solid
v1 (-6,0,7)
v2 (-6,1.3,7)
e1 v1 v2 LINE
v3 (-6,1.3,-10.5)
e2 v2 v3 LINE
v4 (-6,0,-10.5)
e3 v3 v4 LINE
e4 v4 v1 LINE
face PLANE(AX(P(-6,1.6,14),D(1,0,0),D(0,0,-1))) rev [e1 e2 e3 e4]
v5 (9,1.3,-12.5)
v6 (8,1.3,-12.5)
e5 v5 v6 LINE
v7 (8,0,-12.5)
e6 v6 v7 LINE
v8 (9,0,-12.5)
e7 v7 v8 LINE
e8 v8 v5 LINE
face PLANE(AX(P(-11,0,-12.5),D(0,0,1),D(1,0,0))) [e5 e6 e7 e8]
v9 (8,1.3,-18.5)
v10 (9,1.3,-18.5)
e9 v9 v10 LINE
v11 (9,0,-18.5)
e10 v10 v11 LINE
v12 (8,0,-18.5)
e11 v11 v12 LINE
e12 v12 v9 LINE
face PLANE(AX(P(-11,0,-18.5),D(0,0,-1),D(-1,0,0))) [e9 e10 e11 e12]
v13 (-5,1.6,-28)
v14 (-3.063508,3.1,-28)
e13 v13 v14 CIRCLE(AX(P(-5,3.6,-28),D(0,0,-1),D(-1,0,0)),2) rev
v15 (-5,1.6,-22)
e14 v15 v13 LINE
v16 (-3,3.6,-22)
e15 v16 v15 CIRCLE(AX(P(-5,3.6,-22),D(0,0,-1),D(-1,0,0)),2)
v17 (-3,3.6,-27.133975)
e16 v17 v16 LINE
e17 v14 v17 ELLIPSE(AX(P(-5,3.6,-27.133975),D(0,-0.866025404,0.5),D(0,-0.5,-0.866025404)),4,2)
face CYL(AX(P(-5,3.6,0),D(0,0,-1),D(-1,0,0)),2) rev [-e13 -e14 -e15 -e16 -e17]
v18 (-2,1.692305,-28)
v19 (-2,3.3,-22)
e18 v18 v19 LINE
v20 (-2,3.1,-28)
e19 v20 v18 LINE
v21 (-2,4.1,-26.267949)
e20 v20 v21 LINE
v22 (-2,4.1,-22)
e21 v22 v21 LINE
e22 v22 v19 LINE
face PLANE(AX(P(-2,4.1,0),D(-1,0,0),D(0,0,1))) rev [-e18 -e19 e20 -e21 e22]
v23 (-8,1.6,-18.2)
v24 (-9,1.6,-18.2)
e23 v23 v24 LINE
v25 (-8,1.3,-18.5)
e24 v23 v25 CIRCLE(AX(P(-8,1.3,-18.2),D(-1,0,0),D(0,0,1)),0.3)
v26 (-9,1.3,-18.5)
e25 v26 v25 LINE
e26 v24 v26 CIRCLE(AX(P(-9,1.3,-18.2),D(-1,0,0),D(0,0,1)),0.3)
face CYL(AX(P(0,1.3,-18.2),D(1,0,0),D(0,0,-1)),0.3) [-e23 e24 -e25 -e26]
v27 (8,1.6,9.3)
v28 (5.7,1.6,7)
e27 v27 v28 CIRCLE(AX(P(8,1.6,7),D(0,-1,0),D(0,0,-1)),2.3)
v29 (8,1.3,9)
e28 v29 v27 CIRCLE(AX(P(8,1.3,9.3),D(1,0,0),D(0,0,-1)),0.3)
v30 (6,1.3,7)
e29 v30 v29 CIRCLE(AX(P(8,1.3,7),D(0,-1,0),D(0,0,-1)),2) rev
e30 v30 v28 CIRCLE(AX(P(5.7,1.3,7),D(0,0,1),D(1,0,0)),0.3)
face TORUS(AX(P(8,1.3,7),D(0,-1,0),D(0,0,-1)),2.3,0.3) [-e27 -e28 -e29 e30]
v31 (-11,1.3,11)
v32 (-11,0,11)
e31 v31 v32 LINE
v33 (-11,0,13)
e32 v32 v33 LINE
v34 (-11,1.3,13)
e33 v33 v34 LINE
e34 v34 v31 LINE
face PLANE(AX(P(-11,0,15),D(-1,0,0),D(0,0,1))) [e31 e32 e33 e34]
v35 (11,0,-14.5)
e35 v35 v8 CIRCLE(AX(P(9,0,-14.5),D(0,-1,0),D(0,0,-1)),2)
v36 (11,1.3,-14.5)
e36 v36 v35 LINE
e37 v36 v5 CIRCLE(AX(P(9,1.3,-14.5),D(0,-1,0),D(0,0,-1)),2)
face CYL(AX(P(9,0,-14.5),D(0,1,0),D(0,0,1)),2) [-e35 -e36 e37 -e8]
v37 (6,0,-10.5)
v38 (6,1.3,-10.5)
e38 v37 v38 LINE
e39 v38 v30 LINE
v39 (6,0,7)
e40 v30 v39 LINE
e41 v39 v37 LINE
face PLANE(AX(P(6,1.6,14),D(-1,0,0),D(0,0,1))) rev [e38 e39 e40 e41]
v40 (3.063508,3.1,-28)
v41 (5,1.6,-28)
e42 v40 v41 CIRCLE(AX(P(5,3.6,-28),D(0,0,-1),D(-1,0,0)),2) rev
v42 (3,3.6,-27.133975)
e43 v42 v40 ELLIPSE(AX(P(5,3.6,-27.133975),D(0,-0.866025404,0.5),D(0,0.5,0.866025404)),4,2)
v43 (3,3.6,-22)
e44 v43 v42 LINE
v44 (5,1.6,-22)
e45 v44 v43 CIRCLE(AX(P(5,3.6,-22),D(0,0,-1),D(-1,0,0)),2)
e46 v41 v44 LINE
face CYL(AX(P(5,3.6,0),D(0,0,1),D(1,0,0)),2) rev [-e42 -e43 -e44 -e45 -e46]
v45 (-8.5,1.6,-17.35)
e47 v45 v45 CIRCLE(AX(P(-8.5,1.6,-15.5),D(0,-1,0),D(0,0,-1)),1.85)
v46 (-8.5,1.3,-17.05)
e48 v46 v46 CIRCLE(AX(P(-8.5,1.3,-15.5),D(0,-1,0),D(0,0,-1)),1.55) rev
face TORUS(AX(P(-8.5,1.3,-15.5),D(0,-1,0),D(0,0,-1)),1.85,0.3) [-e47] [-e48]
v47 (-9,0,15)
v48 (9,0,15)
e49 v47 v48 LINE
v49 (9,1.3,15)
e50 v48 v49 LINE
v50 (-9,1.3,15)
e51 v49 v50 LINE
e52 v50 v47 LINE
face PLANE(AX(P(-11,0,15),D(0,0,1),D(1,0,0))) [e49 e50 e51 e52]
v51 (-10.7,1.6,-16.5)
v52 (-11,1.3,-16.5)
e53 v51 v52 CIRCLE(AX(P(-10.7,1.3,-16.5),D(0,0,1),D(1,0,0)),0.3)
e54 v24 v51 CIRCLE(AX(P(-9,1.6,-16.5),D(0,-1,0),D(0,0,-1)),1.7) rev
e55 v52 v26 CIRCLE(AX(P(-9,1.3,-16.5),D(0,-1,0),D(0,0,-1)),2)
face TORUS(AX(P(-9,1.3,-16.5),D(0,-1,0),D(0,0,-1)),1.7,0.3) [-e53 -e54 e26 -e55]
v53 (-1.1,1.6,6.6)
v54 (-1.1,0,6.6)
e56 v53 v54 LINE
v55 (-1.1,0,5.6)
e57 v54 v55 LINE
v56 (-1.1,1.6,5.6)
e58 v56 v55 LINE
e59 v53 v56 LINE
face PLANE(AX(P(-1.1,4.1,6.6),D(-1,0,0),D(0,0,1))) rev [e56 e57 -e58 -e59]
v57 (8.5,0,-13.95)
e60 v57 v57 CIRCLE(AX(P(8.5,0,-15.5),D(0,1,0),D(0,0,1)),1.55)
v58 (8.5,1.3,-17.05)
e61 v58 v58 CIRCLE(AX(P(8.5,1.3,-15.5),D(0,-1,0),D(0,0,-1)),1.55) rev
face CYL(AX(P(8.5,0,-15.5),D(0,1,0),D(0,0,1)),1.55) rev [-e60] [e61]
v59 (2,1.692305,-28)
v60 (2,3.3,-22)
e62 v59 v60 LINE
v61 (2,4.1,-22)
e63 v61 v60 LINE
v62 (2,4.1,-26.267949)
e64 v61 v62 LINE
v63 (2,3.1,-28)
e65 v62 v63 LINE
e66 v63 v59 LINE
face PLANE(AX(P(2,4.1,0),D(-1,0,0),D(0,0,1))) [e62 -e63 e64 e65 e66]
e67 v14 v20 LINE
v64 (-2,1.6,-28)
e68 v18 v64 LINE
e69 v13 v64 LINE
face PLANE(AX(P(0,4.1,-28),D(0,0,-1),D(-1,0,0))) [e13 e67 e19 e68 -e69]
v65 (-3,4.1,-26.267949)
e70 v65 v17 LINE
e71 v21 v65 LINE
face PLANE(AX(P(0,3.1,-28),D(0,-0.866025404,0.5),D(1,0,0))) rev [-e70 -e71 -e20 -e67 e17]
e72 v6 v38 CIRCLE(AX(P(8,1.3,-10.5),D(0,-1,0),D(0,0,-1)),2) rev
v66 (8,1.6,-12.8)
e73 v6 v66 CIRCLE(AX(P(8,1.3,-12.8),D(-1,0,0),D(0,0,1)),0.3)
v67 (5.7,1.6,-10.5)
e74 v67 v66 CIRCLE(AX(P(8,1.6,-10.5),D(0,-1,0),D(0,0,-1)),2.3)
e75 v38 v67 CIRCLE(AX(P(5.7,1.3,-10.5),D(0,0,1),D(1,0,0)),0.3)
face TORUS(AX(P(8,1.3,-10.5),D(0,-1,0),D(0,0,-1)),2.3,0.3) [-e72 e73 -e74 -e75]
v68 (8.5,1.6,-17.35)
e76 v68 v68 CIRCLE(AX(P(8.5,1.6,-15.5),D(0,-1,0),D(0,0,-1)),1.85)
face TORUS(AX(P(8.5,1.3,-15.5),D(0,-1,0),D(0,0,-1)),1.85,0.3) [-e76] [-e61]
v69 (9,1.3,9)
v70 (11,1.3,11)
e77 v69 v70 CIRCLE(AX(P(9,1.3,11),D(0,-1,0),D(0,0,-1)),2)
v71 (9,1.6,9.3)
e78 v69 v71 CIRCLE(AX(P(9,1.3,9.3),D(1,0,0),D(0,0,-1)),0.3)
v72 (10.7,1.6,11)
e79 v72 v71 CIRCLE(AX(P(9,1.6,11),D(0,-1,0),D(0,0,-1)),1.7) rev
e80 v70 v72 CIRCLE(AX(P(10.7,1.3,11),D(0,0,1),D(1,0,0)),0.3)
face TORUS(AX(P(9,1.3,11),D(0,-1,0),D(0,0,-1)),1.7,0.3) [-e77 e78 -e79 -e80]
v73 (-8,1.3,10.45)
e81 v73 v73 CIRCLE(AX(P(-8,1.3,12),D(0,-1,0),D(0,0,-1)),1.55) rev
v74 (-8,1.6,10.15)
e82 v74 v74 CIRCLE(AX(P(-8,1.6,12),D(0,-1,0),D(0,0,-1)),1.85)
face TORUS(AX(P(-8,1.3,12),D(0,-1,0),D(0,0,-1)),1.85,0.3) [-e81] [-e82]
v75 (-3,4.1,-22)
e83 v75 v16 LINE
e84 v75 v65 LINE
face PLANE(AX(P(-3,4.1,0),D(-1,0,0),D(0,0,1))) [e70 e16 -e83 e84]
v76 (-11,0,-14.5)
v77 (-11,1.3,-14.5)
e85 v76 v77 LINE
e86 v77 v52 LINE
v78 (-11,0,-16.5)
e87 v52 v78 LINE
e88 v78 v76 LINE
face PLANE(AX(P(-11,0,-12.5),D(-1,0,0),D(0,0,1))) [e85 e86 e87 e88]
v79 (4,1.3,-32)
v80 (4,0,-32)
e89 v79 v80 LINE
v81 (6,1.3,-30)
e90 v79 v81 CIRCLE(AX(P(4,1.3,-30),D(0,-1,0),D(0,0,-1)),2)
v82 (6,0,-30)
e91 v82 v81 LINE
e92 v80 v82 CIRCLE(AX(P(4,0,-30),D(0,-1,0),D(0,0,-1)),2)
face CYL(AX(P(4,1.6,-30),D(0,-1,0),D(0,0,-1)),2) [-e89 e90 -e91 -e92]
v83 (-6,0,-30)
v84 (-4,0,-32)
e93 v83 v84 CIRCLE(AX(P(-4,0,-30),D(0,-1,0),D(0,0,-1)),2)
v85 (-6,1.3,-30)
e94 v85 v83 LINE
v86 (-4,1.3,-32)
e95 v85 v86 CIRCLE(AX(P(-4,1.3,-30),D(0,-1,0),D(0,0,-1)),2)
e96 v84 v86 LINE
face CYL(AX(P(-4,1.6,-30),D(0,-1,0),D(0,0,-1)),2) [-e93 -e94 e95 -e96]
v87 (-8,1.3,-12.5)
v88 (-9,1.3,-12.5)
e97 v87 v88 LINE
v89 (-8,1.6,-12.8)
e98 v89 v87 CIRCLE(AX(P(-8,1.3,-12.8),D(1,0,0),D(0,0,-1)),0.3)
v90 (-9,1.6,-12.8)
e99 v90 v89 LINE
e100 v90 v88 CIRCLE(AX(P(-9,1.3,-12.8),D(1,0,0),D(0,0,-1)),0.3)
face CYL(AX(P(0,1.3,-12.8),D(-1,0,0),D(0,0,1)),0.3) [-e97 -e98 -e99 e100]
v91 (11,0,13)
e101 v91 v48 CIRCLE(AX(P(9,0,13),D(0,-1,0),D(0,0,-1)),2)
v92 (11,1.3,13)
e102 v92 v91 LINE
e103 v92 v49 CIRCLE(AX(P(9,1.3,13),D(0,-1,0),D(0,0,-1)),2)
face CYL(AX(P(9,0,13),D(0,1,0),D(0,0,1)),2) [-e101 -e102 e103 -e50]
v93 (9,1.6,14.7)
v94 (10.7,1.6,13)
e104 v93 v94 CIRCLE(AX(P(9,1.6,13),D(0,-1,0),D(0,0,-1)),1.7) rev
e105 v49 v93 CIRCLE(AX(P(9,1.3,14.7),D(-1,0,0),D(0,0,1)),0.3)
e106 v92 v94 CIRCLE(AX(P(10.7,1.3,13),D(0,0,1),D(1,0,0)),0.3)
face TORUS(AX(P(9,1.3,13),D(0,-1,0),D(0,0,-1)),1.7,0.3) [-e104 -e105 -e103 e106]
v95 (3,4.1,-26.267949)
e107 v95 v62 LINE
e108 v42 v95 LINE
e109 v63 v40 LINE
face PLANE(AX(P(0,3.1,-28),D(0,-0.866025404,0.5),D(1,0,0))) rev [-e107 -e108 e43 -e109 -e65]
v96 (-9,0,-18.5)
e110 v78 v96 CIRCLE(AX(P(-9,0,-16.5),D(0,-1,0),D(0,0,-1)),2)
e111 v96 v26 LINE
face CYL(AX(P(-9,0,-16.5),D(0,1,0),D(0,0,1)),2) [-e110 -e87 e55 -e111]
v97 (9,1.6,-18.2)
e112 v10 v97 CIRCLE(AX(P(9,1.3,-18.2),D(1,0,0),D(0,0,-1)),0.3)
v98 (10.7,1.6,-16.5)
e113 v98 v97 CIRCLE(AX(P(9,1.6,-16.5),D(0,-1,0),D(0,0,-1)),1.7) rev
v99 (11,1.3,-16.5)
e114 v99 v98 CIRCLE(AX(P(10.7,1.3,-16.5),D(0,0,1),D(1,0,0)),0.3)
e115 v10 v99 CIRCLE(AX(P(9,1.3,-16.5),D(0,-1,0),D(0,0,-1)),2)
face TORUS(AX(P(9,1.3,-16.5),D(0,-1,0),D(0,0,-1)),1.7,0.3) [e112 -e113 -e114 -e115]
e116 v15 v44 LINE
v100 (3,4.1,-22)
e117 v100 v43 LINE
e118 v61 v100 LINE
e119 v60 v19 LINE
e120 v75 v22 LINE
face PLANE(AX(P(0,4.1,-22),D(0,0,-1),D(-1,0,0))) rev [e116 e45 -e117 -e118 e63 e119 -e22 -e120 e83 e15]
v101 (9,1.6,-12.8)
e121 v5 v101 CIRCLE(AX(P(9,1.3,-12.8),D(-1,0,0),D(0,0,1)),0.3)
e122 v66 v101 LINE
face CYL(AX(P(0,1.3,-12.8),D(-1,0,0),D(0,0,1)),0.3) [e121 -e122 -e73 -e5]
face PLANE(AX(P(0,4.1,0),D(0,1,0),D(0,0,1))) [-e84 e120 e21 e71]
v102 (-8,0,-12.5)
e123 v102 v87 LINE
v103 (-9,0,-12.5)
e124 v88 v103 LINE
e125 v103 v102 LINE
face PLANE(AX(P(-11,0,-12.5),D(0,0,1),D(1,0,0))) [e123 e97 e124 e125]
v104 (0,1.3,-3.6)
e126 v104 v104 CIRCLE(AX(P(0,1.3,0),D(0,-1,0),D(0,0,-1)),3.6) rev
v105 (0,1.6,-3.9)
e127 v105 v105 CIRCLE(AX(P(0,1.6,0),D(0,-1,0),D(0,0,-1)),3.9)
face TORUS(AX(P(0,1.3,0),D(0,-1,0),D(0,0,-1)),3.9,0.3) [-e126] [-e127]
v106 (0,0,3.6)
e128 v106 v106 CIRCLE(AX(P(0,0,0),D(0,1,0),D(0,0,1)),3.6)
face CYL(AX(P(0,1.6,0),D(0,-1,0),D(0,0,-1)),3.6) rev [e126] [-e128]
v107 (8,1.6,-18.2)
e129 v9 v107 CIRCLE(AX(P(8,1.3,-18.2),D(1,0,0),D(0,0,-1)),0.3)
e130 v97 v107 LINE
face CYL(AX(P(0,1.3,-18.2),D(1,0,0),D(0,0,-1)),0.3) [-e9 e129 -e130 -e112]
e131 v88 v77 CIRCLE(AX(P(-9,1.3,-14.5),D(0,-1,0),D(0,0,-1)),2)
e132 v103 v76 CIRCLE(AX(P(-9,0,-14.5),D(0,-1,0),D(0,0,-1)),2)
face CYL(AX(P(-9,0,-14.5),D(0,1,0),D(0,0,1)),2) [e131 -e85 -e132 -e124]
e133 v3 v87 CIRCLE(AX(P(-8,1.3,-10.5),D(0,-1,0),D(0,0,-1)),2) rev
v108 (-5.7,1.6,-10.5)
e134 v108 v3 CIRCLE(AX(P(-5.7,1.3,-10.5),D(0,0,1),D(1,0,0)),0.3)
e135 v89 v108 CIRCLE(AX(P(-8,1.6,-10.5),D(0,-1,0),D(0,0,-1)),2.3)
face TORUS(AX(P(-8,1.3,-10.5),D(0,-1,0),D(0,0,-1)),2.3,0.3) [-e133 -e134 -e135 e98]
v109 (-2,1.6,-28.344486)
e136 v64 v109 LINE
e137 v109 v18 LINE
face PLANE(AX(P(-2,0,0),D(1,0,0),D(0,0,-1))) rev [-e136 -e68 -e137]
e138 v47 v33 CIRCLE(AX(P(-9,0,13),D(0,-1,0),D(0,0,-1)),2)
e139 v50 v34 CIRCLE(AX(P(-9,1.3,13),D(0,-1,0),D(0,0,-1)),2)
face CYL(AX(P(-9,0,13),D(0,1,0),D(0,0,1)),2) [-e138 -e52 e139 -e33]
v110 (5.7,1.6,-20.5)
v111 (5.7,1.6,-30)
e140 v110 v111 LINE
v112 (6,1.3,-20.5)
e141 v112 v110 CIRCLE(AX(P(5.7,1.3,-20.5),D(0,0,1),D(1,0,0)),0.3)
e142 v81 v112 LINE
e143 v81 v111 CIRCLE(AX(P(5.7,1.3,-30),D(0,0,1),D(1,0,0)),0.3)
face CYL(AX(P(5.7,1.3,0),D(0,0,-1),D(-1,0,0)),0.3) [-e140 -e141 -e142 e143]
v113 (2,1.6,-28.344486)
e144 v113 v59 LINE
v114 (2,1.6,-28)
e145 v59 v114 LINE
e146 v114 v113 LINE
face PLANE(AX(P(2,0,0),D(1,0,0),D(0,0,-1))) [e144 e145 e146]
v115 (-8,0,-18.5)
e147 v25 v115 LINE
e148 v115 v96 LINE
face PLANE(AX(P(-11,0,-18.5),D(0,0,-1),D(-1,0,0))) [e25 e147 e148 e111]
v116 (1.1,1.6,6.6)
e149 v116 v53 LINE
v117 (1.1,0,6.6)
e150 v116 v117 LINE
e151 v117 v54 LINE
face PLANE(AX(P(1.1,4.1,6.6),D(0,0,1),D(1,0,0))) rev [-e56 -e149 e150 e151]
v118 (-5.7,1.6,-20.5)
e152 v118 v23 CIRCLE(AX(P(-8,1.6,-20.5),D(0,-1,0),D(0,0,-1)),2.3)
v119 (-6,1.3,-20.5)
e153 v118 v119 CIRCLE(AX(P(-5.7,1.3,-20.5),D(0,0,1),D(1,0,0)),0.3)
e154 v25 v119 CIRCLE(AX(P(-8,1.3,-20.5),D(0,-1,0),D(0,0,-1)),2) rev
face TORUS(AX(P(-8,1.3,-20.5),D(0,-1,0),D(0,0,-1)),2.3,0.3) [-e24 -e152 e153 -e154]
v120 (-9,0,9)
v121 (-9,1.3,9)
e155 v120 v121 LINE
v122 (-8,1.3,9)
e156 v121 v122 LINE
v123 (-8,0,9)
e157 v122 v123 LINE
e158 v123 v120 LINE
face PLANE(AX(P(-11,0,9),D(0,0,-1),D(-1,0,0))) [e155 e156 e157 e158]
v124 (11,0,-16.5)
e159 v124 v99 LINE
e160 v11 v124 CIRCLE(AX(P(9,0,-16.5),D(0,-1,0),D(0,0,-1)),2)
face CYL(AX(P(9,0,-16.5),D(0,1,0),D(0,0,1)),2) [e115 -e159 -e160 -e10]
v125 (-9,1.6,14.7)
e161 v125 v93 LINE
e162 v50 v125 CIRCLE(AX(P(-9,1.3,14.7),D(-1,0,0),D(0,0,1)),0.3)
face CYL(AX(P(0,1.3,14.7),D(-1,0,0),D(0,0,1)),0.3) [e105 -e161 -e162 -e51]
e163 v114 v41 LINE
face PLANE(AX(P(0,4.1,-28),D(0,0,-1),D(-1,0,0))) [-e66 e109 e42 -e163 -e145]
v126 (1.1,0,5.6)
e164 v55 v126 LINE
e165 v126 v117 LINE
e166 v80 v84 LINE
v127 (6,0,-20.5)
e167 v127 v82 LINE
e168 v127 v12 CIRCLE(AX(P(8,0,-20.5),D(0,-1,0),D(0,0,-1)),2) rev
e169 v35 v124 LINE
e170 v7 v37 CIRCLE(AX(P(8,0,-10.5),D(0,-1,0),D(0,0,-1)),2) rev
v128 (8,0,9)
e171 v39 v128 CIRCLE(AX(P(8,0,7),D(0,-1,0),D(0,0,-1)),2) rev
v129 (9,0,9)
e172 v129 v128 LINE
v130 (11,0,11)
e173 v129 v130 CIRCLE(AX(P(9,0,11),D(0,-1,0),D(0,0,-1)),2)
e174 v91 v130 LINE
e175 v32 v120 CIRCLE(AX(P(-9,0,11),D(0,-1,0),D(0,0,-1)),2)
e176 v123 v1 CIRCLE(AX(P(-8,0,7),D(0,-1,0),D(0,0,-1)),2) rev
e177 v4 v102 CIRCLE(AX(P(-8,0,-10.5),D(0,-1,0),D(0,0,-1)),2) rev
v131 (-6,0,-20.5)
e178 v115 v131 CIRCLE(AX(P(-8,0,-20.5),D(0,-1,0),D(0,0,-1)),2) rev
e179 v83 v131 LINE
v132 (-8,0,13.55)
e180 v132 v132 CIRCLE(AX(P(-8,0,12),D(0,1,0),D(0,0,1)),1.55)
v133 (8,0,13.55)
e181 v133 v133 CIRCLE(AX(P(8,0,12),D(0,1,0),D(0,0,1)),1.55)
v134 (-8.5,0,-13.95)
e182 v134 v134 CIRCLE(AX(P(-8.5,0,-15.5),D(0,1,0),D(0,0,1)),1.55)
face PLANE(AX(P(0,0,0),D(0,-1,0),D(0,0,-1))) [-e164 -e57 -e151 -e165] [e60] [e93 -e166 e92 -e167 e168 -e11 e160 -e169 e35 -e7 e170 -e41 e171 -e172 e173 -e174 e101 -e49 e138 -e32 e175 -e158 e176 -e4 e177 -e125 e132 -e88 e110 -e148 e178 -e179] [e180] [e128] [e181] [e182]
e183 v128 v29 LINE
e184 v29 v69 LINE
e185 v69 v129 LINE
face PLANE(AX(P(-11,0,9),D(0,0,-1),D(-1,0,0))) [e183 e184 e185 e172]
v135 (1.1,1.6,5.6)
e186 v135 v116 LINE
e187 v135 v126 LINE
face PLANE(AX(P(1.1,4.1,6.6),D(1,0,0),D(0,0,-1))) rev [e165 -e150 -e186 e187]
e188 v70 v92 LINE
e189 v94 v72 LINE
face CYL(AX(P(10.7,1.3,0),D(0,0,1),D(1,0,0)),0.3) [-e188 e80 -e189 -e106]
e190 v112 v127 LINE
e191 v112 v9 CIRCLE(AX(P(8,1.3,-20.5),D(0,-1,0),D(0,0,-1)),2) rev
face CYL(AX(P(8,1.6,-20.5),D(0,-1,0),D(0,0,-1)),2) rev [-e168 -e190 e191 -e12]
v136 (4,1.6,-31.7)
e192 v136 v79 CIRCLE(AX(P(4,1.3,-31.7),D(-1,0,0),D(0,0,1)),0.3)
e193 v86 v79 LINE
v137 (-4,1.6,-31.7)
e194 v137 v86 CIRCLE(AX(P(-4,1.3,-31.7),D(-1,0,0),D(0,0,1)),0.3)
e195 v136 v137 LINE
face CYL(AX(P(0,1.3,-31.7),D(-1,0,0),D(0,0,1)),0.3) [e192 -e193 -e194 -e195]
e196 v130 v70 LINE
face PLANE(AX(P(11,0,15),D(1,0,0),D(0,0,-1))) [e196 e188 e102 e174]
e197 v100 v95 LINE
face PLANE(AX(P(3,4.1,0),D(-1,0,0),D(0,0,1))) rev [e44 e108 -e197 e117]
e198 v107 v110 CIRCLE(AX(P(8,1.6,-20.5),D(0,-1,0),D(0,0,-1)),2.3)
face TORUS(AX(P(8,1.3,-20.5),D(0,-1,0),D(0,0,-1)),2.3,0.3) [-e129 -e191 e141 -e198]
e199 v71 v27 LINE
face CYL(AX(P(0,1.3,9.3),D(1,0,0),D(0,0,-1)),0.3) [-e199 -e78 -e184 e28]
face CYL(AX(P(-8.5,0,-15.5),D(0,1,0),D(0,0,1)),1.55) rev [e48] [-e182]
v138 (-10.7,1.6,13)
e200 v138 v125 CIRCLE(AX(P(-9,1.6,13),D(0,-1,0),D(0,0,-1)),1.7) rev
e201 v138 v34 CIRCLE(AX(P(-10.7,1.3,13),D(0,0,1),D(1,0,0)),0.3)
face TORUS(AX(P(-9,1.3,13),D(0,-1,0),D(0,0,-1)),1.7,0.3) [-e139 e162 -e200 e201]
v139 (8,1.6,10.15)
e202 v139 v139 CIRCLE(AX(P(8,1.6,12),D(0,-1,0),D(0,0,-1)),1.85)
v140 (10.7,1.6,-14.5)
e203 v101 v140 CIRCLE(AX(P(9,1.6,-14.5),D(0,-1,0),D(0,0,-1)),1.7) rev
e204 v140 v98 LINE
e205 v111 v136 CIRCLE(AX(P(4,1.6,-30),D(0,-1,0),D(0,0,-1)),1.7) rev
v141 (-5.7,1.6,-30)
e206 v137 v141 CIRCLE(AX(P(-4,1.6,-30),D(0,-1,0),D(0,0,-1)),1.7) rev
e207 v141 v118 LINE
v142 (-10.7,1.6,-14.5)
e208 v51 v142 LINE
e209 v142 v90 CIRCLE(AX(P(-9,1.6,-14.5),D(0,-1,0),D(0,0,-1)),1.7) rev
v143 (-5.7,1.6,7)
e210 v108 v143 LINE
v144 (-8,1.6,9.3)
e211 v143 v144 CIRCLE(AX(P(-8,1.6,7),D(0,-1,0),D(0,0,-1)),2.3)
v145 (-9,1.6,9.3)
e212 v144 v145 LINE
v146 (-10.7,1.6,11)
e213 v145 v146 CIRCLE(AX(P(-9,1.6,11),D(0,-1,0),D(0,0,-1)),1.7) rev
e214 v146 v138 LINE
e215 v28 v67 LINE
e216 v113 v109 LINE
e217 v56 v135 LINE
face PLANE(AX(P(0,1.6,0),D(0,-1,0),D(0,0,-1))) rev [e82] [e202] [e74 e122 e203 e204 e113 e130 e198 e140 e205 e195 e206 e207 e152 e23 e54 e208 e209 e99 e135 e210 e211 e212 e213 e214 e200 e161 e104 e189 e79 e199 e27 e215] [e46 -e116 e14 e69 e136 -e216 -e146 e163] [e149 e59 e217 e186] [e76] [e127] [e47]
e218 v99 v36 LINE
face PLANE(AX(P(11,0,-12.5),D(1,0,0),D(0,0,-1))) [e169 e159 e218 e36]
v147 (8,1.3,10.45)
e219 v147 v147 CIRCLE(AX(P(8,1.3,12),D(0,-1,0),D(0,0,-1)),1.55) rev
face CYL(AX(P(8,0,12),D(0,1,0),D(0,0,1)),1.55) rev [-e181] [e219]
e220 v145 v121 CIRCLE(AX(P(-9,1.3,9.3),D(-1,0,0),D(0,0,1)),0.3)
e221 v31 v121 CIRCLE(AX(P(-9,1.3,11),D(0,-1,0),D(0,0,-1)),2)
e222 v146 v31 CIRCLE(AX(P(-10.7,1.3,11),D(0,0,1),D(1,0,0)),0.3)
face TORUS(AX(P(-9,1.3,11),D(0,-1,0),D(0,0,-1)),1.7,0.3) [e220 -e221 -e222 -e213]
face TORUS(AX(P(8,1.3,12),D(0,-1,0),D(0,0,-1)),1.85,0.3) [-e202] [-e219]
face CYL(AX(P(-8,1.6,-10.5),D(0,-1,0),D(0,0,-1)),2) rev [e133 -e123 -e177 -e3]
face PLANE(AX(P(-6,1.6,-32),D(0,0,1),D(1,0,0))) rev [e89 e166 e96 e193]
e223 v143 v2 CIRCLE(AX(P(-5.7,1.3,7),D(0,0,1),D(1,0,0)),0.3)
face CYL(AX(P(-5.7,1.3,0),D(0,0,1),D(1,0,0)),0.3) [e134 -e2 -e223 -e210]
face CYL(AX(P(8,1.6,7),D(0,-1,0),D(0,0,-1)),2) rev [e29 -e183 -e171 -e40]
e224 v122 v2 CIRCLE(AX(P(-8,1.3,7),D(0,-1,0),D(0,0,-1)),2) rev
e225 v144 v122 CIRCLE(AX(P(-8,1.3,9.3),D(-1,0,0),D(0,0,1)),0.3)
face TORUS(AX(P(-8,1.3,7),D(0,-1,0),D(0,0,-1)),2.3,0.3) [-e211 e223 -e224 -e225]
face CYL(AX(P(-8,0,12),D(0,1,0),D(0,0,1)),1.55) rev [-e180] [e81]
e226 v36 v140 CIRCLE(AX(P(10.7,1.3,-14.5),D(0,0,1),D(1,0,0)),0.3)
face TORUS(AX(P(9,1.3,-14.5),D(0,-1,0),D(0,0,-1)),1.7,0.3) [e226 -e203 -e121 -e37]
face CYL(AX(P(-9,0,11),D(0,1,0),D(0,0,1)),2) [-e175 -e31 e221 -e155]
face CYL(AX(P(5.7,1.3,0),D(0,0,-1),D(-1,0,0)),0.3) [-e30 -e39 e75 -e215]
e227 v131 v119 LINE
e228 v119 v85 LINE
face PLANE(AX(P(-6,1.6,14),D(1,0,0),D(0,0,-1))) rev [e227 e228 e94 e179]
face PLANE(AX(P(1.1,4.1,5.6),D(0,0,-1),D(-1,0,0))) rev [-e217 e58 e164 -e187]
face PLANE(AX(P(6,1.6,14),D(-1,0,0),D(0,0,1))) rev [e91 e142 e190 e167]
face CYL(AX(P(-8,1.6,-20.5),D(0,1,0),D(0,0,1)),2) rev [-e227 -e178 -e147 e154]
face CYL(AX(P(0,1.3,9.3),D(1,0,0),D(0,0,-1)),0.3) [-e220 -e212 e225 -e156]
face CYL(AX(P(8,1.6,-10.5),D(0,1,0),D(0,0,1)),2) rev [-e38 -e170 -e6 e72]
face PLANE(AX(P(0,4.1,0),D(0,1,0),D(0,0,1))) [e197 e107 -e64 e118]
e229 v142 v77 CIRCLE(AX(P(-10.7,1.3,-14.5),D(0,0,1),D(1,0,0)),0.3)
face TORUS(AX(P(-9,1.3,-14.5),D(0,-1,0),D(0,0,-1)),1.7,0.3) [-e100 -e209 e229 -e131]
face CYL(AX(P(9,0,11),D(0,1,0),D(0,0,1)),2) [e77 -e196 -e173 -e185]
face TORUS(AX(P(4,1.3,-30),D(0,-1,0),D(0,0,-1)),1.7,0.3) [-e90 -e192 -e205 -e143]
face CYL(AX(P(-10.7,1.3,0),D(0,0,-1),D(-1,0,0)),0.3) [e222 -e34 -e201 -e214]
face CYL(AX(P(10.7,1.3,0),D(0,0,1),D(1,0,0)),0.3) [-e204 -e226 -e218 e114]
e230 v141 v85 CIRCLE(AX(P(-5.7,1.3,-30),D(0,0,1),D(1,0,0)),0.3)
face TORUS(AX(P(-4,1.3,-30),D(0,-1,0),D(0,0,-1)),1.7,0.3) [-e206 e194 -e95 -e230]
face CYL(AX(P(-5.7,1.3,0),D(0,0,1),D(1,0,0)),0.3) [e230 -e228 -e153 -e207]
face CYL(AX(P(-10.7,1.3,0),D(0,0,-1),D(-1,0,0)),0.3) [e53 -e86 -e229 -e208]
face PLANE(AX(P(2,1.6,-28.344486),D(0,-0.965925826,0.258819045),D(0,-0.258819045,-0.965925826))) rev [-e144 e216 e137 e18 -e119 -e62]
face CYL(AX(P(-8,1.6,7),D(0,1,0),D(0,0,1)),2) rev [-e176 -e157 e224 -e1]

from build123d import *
from OCP.BRepFilletAPI import BRepFilletAPI_MakeChamfer

# Parameters (mm, degrees)
SKETCH1_W           = 12
SKETCH1_H           = 46
BOSS_EXTRUDE1_DEPTH = 1.6
SKETCH2_R           = 3.6
CUT_EXTRUDE1_DEPTH  = 33.596932371
SKETCH5_W           = 22
SKETCH5_H           = 6
BOSS_EXTRUDE4_DEPTH = 1.6
SKETCH6_R           = 1.55
CUT_EXTRUDE2_DEPTH  = 34.875654975
FILLET1_R           = 2
FILLET2_R           = 0.3
SKETCH8_W           = 1
SKETCH8_H           = 6
BOSS_EXTRUDE6_DEPTH = 2.5
BOSS_EXTRUDE7_DEPTH = 4
SKETCH10_W          = 2.2
SKETCH10_H          = 1
CUT_EXTRUDE3_DEPTH  = 35.085334122
CHAMFER1_SIZE       = 1
CHAMFER1_SIZE2      = 1.732050808
FILLET5_R           = 2


with BuildPart() as part:
    # Sketch1 → Boss-Extrude1 (new body)
    with BuildSketch(Plane(origin=(0, 0, 0), x_dir=(1, 0, 0), z_dir=(0, 1, 0))):
        with Locations((0, 9)):
            Rectangle(SKETCH1_W, SKETCH1_H)
    extrude(amount=BOSS_EXTRUDE1_DEPTH)

    # Sketch2 → Cut-Extrude1 (cut, through all)
    with BuildSketch(Plane(origin=(0, 0, 0), x_dir=(1, 0, 0), z_dir=(0, 1, 0))):
        with Locations(Location((0, 0, 0), (0, 0, 270))):
            Circle(SKETCH2_R)
    extrude(amount=CUT_EXTRUDE1_DEPTH, mode=Mode.SUBTRACT)

    # Sketch5 → Boss-Extrude4 (add)
    with BuildSketch(Plane(origin=(0, 1.6, 0), x_dir=(1, 0, 0), z_dir=(0, 1, 0))):
        with Locations((0, 15.5)):
            Rectangle(SKETCH5_W, SKETCH5_H)
        with Locations((0, -12)):
            Rectangle(SKETCH5_W, SKETCH5_H)
    extrude(amount=-BOSS_EXTRUDE4_DEPTH)

    # Sketch6 → Cut-Extrude2 (cut, through all)
    with BuildSketch(Plane(origin=(0, 1.6, 0), x_dir=(1, 0, 0), z_dir=(0, 1, 0))):
        with Locations(Location((-8.5, 15.5, 0), (0, 0, 270))):
            Circle(SKETCH6_R)
        with Locations(Location((8.5, 15.5, 0), (0, 0, 270))):
            Circle(SKETCH6_R)
        with Locations(Location((8, -12, 0), (0, 0, 270))):
            Circle(SKETCH6_R)
        with Locations(Location((-8, -12, 0), (0, 0, 270))):
            Circle(SKETCH6_R)
    extrude(amount=-CUT_EXTRUDE2_DEPTH, mode=Mode.SUBTRACT)

    # Fillet1
    fillet1_edges = [part.edges().sort_by_distance(p)[0] for p in [
        (11, 0.8, -12.5),
        (-11, 0.8, -18.5),
        (11, 0.8, -18.5),
        (6, 0.8, -12.5),
        (-6, 0.8, -12.5),
        (-11, 0.8, -12.5),
        (6, 0.8, -18.5),
        (-6, 0.8, -18.5),
        (-11, 0.8, 9),
        (11, 0.8, 9),
        (11, 0.8, 15),
        (-11, 0.8, 15),
        (6, 0.8, 9),
        (-6, 0.8, 9),
        (-6, 0.8, -32),
        (6, 0.8, -32),
    ]]
    fillet(fillet1_edges, radius=FILLET1_R)

    # Fillet2
    fillet2_edges = [part.edges().sort_by_distance(p)[0] for p in [
        (-10.414213562, 1.6, -17.914213562),
        (10.414213562, 1.6, -17.914213562),
        (10.414213562, 1.6, -13.085786438),
        (-5.414213562, 1.6, -31.414213562),
        (5.414213562, 1.6, -31.414213562),
        (-10.414213562, 1.6, 9.585786438),
        (-10.414213562, 1.6, 14.414213562),
        (10.414213562, 1.6, 9.585786438),
        (10.414213562, 1.6, 14.414213562),
        (6.585786438, 1.6, 8.414213562),
        (-6.585786438, 1.6, 8.414213562),
        (6.585786438, 1.6, -11.914213562),
        (6.585786438, 1.6, -19.085786438),
        (-6.585786438, 1.6, -19.085786438),
        (-6.585786438, 1.6, -11.914213562),
        (0, 1.6, -3.6),
        (-8, 1.6, 10.45),
        (8, 1.6, 10.45),
        (8.5, 1.6, -17.05),
        (-8.5, 1.6, -17.05),
        (0, 1.6, 15),
        (8.5, 1.6, 9),
        (6, 1.6, -1.75),
        (8.5, 1.6, -12.5),
        (11, 1.6, -15.5),
        (8.5, 1.6, -18.5),
        (6, 1.6, -25.25),
        (0, 1.6, -32),
        (-6, 1.6, -25.25),
        (-8.5, 1.6, -18.5),
        (-11, 1.6, -15.5),
        (-8.5, 1.6, -12.5),
        (-6, 1.6, -1.75),
        (-8.5, 1.6, 9),
        (-11, 1.6, 12),
        (11, 1.6, 12),
        (-10.414213562, 1.6, -13.085786438),
    ]]
    fillet(fillet2_edges, radius=FILLET2_R)

    # Sketch8 → Boss-Extrude6 (add)
    with BuildSketch(Plane(origin=(0, 1.6, 0), x_dir=(1, 0, 0), z_dir=(0, 1, 0))):
        with Locations((-2.5, 25)):
            Rectangle(SKETCH8_W, SKETCH8_H)
        with Locations((2.5, 25)):
            Rectangle(SKETCH8_W, SKETCH8_H)
    extrude(amount=BOSS_EXTRUDE6_DEPTH)

    # Sketch9 → Boss-Extrude7 (add)
    with BuildSketch(Plane(origin=(-2, 0, 0), x_dir=(0, 0, -1), z_dir=(1, 0, 0))):
        Polygon((22, 1.6), (28.344486373, 1.6), (22, 3.3), align=None)
    extrude(amount=BOSS_EXTRUDE7_DEPTH)

    # Sketch10 → Cut-Extrude3 (cut, through all)
    with BuildSketch(Plane.XZ):
        with Locations((0, 6.1)):
            Rectangle(SKETCH10_W, SKETCH10_H)
    extrude(amount=-CUT_EXTRUDE3_DEPTH, mode=Mode.SUBTRACT)

    # Chamfer1: one chamfer whose edges measure the first distance from different faces: ONE call of the kernel's chamfer builder (chamfer() names one face for all edges)
    chamfer1_edges_1 = [part.edges().sort_by_distance(p)[0] for p in [
        (-2.5, 4.1, -28),
    ]]
    chamfer1_side_1 = [part.faces().sort_by_distance(p)[0] for p in [
        (-2.5, 2.85, -28),
    ]]
    chamfer1_edges_2 = [part.edges().sort_by_distance(p)[0] for p in [
        (2.5, 4.1, -28),
    ]]
    chamfer1_side_2 = [part.faces().sort_by_distance(p)[0] for p in [
        (2.5, 2.85, -28),
    ]]
    chamfer1 = BRepFilletAPI_MakeChamfer(part.part.solid().wrapped)
    for e in chamfer1_edges_1:
        chamfer1.Add(CHAMFER1_SIZE, CHAMFER1_SIZE2, e.wrapped, chamfer1_side_1[0].wrapped)  # the first distance lies on this face
    for e in chamfer1_edges_2:
        chamfer1.Add(CHAMFER1_SIZE, CHAMFER1_SIZE2, e.wrapped, chamfer1_side_2[0].wrapped)  # the first distance lies on this face
    add(Compound.cast(chamfer1.Shape()), mode=Mode.REPLACE)

    # Fillet5
    # the kernel refuses this fillet: 2 mm, written as the material it adds along each edge
    with BuildSketch(Plane(origin=(3, 1.6, -22), x_dir=(0, 1, 0), z_dir=(0, 0, -1))) as fillet5_piece_1_section:
        with BuildLine():
            CenterArc((FILLET5_R, FILLET5_R), FILLET5_R, 180, 90)
            Line((0, FILLET5_R), (0, 0))
            Line((0, 0), (FILLET5_R, 0))
        make_face()
    fillet5_piece_1 = extrude(amount=6, mode=Mode.PRIVATE)
    fillet5_piece_1 = split(fillet5_piece_1, bisect_by=Plane(origin=(3.453623977, 4.138749703, -26.200832738), z_dir=(0, -0.8660254037844397, 0.4999999999999982)), keep=Keep.TOP, mode=Mode.PRIVATE)
    add(fillet5_piece_1)
    with BuildSketch(Plane(origin=(-3, 1.6, -28), x_dir=(-1, 0, 0), z_dir=(0, 0, 1))) as fillet5_piece_2_section:
        with BuildLine():
            CenterArc((FILLET5_R, -FILLET5_R), FILLET5_R, 90, 90)
            Line((0, -FILLET5_R), (0, 0))
            Line((0, 0), (FILLET5_R, 0))
        make_face()
    fillet5_piece_2 = extrude(amount=6, mode=Mode.PRIVATE)
    fillet5_piece_2 = split(fillet5_piece_2, bisect_by=Plane(origin=(-3.453623978, 4.138749702, -26.200832739), z_dir=(0, -0.8660254037844397, 0.4999999999999982)), keep=Keep.TOP, mode=Mode.PRIVATE)
    add(fillet5_piece_2)


solid = part.part
